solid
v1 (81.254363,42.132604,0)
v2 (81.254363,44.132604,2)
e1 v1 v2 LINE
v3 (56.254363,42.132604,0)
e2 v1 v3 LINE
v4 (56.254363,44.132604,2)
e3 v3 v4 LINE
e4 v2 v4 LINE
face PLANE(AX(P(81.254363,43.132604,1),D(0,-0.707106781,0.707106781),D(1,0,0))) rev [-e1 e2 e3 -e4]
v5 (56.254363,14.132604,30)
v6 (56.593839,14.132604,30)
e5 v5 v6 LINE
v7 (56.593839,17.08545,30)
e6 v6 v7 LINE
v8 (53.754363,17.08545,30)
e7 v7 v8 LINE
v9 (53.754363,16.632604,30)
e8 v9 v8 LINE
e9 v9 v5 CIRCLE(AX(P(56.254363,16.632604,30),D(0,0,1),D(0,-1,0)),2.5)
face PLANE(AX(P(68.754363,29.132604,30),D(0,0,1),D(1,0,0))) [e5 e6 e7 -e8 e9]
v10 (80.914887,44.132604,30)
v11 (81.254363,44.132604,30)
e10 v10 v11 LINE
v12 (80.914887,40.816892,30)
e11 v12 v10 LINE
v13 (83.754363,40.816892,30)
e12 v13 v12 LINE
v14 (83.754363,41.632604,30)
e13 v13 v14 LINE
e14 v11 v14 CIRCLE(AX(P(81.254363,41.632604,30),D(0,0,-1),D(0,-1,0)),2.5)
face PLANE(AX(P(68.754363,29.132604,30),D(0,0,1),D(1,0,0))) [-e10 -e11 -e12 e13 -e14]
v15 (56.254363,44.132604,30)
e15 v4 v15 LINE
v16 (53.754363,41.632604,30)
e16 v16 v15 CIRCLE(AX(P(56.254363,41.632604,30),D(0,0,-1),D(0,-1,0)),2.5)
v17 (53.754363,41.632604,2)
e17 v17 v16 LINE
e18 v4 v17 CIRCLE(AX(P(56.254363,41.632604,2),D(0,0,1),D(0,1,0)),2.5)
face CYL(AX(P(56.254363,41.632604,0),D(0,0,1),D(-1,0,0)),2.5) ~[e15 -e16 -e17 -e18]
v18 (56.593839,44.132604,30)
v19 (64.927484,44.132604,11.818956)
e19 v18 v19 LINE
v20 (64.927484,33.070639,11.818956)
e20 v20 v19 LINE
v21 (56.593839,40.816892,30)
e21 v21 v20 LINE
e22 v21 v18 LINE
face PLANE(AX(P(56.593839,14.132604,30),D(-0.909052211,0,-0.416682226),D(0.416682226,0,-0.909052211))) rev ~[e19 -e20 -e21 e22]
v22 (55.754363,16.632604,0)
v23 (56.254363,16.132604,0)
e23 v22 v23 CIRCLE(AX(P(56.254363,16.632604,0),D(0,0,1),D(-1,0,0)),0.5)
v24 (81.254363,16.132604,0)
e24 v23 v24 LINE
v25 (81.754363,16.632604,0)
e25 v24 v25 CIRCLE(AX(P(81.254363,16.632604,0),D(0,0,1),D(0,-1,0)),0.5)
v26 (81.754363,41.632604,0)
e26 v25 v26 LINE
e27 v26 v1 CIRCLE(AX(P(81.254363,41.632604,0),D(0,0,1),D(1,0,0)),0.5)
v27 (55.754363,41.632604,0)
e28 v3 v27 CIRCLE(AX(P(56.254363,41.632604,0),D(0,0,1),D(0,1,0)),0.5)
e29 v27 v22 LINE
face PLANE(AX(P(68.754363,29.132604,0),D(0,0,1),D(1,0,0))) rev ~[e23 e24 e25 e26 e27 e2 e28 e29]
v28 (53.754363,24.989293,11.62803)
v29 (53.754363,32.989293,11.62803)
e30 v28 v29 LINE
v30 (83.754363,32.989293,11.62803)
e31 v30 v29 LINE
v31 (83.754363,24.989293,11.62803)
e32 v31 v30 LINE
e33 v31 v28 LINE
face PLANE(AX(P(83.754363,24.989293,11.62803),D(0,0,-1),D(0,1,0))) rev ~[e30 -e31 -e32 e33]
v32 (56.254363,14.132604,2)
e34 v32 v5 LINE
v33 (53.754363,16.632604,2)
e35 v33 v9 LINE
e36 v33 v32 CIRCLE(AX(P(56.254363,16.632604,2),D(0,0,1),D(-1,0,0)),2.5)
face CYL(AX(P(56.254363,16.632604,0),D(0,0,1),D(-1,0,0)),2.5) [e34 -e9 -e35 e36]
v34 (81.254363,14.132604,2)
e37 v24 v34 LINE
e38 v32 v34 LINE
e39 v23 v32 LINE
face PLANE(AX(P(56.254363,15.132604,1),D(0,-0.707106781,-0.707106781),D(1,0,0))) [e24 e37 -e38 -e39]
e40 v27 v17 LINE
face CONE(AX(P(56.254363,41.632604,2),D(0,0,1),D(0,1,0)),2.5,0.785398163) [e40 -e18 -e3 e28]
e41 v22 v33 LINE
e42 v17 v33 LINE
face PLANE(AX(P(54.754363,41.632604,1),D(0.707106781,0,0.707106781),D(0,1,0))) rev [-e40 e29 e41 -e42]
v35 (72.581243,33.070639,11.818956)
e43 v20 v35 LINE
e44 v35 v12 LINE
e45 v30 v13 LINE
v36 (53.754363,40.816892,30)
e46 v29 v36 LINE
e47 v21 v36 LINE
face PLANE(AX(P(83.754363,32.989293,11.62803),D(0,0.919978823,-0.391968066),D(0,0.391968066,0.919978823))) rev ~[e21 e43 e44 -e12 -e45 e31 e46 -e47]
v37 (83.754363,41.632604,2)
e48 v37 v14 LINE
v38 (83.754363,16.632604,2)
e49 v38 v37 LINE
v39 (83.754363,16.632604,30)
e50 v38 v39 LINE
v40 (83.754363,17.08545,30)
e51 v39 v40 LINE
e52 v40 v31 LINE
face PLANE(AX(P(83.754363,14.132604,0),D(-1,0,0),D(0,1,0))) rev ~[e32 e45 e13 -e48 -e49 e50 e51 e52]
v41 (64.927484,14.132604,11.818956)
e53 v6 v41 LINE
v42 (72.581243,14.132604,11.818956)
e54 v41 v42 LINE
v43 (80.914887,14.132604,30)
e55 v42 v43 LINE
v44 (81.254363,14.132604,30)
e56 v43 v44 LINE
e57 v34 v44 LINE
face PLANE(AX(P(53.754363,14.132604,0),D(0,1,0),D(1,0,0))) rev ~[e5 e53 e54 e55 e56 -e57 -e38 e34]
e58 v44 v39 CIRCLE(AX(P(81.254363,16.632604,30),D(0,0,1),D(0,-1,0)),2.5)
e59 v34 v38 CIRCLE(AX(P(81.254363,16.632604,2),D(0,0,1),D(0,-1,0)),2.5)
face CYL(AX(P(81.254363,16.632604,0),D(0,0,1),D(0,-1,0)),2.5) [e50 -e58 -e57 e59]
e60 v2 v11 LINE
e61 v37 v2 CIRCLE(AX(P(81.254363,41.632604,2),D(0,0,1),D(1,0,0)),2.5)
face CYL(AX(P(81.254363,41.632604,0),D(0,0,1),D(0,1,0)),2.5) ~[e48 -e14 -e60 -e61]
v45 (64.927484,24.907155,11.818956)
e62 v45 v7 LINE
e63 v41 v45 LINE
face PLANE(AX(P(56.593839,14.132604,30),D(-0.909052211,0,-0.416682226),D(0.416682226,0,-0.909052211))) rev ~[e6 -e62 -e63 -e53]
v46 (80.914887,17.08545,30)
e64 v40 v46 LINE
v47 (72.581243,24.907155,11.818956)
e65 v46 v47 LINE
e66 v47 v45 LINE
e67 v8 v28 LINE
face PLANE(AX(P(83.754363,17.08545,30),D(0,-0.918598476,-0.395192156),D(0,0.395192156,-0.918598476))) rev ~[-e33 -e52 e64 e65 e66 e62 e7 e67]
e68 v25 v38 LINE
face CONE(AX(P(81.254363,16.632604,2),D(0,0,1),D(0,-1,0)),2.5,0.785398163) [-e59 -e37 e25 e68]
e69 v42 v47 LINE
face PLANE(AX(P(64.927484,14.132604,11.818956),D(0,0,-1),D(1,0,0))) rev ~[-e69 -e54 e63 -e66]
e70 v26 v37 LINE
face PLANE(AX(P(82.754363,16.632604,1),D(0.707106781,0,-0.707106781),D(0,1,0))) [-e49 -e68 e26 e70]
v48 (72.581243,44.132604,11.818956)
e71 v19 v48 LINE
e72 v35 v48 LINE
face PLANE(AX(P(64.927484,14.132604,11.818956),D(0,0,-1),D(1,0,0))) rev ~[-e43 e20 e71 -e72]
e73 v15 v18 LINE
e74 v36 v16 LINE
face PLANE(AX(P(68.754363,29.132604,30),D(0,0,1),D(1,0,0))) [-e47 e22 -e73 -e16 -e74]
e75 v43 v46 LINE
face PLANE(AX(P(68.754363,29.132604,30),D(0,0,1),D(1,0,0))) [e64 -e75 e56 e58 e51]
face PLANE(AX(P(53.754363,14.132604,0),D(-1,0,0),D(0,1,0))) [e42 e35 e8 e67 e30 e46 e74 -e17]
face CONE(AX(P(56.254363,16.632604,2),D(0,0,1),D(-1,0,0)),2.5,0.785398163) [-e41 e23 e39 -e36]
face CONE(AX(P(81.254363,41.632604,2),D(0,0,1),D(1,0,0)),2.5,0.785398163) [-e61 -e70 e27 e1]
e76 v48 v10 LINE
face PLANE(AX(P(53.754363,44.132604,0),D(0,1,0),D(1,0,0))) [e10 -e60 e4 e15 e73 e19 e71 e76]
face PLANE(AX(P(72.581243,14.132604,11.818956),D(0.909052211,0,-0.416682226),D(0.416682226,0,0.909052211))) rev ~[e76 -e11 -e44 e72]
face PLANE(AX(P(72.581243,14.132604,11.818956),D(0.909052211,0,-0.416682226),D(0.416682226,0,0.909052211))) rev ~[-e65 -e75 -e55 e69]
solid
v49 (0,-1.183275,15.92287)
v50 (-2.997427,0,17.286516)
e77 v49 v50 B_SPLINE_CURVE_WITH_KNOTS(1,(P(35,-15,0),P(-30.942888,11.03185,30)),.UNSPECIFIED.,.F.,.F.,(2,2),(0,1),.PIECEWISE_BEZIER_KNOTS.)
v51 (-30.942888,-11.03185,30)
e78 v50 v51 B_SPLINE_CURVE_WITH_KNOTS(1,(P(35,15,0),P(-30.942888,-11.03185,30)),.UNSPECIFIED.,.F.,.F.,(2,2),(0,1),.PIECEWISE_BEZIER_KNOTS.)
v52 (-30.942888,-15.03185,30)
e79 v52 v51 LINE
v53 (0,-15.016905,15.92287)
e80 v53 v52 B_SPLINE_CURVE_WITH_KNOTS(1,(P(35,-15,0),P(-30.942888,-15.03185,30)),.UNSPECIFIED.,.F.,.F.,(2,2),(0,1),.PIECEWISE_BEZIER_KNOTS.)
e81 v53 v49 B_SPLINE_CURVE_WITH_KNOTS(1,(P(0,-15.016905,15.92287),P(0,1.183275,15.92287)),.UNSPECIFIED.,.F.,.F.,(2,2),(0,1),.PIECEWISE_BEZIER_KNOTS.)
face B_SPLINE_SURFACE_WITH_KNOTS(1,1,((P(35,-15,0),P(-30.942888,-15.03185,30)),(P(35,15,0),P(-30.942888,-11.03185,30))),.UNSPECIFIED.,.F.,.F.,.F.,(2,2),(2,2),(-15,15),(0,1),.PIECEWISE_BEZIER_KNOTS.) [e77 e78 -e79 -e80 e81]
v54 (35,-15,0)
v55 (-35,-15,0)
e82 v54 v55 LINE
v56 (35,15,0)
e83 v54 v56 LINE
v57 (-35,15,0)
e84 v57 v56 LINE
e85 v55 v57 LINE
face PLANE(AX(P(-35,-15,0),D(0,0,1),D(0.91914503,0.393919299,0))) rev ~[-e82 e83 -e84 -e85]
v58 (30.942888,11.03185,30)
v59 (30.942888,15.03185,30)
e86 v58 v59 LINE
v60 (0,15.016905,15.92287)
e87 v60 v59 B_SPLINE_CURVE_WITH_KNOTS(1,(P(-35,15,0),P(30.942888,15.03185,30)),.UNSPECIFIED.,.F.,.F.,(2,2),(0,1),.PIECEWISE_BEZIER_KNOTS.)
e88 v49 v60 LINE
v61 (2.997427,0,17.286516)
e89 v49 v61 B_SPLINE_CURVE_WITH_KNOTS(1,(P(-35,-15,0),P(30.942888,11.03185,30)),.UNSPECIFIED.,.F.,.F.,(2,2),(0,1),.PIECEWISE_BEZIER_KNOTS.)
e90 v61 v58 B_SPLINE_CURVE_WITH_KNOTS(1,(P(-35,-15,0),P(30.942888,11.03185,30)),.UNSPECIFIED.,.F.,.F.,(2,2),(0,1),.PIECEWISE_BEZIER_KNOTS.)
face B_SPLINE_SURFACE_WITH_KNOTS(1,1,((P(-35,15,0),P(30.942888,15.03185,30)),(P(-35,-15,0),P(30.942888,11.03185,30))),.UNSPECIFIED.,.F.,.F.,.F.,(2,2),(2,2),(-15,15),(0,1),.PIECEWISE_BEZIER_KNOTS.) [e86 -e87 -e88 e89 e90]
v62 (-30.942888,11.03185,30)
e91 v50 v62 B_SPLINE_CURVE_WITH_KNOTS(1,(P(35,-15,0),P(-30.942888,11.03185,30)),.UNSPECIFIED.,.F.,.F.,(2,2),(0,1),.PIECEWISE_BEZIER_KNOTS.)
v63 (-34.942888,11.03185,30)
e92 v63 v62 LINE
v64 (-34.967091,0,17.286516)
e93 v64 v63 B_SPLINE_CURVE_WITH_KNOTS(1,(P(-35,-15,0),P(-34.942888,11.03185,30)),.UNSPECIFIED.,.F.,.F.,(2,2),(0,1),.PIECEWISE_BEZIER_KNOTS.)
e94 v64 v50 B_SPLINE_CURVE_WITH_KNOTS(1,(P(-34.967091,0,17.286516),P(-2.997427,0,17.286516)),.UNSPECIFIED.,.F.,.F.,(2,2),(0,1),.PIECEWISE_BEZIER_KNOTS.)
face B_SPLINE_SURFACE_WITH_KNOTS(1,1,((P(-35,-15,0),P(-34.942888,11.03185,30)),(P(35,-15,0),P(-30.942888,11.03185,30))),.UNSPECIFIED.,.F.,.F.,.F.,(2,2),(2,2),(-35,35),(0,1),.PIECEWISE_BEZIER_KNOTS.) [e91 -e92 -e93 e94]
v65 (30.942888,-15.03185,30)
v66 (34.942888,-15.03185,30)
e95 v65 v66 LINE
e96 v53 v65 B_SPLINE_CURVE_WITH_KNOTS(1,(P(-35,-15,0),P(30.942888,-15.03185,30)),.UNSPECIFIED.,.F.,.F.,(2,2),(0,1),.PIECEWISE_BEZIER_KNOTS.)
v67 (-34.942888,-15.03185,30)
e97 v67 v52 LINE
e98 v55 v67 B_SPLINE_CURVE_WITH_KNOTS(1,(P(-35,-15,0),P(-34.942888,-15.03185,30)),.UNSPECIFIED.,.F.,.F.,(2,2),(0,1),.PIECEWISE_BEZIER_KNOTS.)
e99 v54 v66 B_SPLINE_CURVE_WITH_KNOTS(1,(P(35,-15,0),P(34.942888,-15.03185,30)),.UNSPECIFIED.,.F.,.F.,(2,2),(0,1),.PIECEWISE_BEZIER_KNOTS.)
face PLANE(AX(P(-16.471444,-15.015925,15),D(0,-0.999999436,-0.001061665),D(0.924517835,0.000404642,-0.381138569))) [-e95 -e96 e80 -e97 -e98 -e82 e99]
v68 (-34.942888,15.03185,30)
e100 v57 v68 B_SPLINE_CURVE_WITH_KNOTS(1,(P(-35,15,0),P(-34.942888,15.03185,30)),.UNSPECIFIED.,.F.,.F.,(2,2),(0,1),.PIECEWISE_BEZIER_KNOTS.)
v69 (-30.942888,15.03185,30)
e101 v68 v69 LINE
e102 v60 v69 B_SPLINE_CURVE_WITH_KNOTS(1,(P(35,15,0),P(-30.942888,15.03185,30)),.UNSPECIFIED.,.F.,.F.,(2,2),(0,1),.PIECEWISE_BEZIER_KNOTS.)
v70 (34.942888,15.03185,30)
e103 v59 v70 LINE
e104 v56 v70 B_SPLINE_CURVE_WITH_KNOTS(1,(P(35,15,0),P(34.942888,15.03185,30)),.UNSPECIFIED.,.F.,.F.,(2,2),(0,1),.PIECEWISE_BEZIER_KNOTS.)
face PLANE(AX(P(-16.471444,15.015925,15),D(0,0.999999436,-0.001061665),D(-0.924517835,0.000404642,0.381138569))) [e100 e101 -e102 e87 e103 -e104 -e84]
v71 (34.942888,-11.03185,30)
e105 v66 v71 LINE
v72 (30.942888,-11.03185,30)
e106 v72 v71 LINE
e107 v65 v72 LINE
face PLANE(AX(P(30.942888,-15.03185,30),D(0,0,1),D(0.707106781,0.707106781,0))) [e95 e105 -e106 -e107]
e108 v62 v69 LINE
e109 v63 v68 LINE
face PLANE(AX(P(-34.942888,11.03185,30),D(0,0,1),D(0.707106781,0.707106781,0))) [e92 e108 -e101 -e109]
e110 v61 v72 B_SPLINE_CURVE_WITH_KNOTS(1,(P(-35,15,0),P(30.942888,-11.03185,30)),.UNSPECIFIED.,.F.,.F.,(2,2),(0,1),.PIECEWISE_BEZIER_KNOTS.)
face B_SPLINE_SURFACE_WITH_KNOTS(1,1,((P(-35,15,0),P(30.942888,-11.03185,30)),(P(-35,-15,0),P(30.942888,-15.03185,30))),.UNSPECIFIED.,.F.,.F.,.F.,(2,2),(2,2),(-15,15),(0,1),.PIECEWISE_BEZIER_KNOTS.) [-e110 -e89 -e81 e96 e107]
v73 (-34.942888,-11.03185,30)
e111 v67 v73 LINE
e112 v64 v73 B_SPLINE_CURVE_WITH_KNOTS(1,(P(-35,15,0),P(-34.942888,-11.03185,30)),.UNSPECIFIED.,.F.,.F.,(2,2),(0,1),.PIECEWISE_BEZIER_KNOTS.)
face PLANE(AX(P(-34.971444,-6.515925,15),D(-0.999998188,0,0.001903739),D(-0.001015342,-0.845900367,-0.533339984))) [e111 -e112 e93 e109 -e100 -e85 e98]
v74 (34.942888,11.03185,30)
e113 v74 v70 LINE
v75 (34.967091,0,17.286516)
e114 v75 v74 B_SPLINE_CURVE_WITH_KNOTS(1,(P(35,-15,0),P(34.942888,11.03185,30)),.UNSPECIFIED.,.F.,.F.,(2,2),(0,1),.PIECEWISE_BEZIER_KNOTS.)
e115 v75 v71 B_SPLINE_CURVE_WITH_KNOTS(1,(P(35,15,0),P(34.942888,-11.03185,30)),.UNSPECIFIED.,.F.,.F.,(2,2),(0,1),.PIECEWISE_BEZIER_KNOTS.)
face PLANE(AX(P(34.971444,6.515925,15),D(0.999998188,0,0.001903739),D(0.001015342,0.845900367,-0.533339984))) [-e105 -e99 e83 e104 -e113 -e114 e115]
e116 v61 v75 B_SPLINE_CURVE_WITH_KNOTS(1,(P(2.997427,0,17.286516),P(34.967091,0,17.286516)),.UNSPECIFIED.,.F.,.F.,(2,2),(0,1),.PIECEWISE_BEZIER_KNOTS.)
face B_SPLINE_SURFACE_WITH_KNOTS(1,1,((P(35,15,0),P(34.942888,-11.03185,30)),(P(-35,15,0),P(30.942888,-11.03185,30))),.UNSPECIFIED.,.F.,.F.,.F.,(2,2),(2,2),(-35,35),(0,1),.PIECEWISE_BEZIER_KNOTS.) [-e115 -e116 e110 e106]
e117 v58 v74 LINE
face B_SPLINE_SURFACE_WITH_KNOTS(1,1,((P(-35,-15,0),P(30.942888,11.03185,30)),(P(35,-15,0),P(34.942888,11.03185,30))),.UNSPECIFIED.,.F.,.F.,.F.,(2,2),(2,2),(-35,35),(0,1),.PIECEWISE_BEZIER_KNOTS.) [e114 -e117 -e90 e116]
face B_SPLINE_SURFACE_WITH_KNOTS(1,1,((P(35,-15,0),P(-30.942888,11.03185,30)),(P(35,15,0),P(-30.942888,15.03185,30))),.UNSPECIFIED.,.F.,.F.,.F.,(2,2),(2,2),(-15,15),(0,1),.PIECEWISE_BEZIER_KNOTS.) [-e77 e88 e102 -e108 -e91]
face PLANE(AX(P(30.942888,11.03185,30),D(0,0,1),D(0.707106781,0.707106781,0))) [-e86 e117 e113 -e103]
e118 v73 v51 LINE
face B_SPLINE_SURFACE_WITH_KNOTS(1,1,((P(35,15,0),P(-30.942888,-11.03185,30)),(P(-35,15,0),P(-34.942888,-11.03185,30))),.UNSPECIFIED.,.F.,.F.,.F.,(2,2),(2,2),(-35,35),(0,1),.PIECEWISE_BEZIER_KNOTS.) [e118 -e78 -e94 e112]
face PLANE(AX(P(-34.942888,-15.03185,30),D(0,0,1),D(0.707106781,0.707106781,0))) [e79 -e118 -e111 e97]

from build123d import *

# Parameters (mm, degrees)
F0_W      = 70
F0_H      = 30
F2_W      = 4
F2_H      = 4
F7_W      = 30
F7_H      = 30
F8_DEPTH  = 30
F10_DEPTH = 30
F12_DEPTH = 30
F13_R     = 2.5
F14_SIZE  = 2
F16_DEPTH = 1


# Not quite as in the source:
# - the program builds the solid bodies; features that only make, move or delete a surface that nothing else refers to are left out


with BuildPart() as f3:
    # F0 (on Top) → F3 section 0
    with BuildSketch(Plane.XY):
        Rectangle(F0_W, F0_H)
    # F2 (on offset) → F3 section 1
    with BuildSketch(Plane.XY.offset(30)):
        with Locations((-32.9428877234, 13.0318499655)):
            Rectangle(F2_W, F2_H)
    loft()

    # F0 (on Top) → F4 section 0
    with BuildSketch(Plane.XY):
        Rectangle(F0_W, F0_H)
    # F2 (on offset) → F4 section 1
    with BuildSketch(Plane.XY.offset(30)):
        with Locations((-32.9428877234, -13.0318499655)):
            Rectangle(F2_W, F2_H)
    loft()

    # F0 (on Top) → F5 section 0
    with BuildSketch(Plane.XY):
        Rectangle(F0_W, F0_H)
    # F2 (on offset) → F5 section 1
    with BuildSketch(Plane.XY.offset(30)):
        with Locations((32.9428877234, 13.0318499655)):
            Rectangle(F2_W, F2_H)
    loft()

    # F0 (on Top) → F6 section 0
    with BuildSketch(Plane.XY):
        Rectangle(F0_W, F0_H)
    # F2 (on offset) → F6 section 1
    with BuildSketch(Plane.XY.offset(30)):
        with Locations((32.9428877234, -13.0318499655)):
            Rectangle(F2_W, F2_H)
    loft()

    # F15 (on face) → F16 (cut)
    with BuildSketch(Plane.XY):
        with BuildLine():
            Line((35.1080348898, -15.1526350975), (34.9516024797, -15.1445783328))
            add(Edge.make_bspline(
                [(34.9516024797, -15.1445783328), (35.015165041, -15.1823826041), (35.0943421483, -15.2143125307), (35.1068899686, -15.1744342874), (35.1080348898, -15.1526350975)],
                knots=[0.9766966093, 0.9766966093, 0.9766966093, 0.9766966093, 0.9875020446, 0.9956975312, 0.9956975312, 0.9956975312, 0.9956975312], degree=3))
        make_face()
        with BuildLine():
            add(Edge.make_bspline(
                [(34.9719375372, 15.0837432593), (34.3538024078, 14.0181605259), (33.061090265, 11.7896967595), (28.21171153, 13.2006080373), (27.1952390941, 9.3934277248), (29.922433417, 8.7236693731), (30.66603681, 5.9963298393), (28.2491739951, 4.334922985), (27.3280801702, 1.5528957375), (30.0258958231, -0.6289713137), (28.5607968581, -2.7152455487), (26.9189490059, -6.683113184), (28.0022887063, -10.124238159), (31.4043979295, -12.0624753884), (34.4968064554, -14.8740852642), (34.9516024797, -15.1445783328)],
                knots=[0, 0, 0, 0, 0.0798778427, 0.1670493267, 0.2351952706, 0.3009592707, 0.365159693, 0.4364229102, 0.5052200474, 0.5772019582, 0.6402928372, 0.7295168151, 0.8063783849, 0.8993827171, 0.9766966093, 0.9766966093, 0.9766966093, 0.9766966093], degree=3))
            Line((34.9719375372, 15.0837432593), (30.7977404445, 15.1190953329))
            add(Edge.make_bspline(
                [(30.7977404445, 15.1190953329), (27.9337164263, 14.9101728987), (23.2612948103, 14.5693329856), (21.9160397808, 10.5126541312), (24.7378669193, 8.603835829), (26.4017007473, 6.8089006332), (24.7706534907, 4.1161935184), (23.430847623, 2.0997794876), (24.2510655844, -0.0048017343), (23.8127653987, -3.4550826329), (22.7751457805, -5.8090586344), (23.1402314335, -9.1926239549), (26.1749460731, -14.6137627403), (29.3308994565, -14.8300937762), (30.7977404445, -14.9306412786)],
                knots=[0, 0, 0, 0, 0.1234279581, 0.2013626477, 0.2811427777, 0.3472159084, 0.4234693912, 0.4927276654, 0.5582341134, 0.6420069112, 0.7141429329, 0.7966122672, 0.9054683556, 1, 1, 1, 1], degree=3))
            Line((30.7977404445, -14.9306412786), (34.9516024797, -15.1445783328))
        make_face()
        with BuildLine():
            Line((-30.7977404445, 15.1190953329), (-34.9719375372, 15.0837432593))
            add(Edge.make_bspline(
                [(-34.9719375372, 15.0837432593), (-34.3538024078, 14.0181605259), (-33.061090265, 11.7896967595), (-28.21171153, 13.2006080373), (-27.1952390941, 9.3934277248), (-29.922433417, 8.7236693731), (-30.66603681, 5.9963298393), (-28.2491739951, 4.334922985), (-27.3280801702, 1.5528957375), (-30.0258958231, -0.6289713137), (-28.5607968581, -2.7152455487), (-26.9189490059, -6.683113184), (-28.0022887063, -10.124238159), (-31.5081547913, -12.1215873684), (-34.7720178817, -15.125865809), (-35.0565479429, -15.1937999645)],
                knots=[0, 0, 0, 0, 0.0798778427, 0.1670493267, 0.2351952706, 0.3009592707, 0.365159693, 0.4364229102, 0.5052200474, 0.5772019582, 0.6402928372, 0.7295168151, 0.8063783849, 0.8993827171, 0.9842350503, 0.9842350503, 0.9842350503, 0.9842350503], degree=3))
            Line((-35.0565479429, -15.1937999645), (-30.7977404445, -14.9306412786))
            add(Edge.make_bspline(
                [(-30.7977404445, 15.1190953329), (-27.9337164263, 14.9101728987), (-23.2612948103, 14.5693329856), (-21.9160397808, 10.5126541312), (-24.7378669193, 8.603835829), (-26.4017007473, 6.8089006332), (-24.7706534907, 4.1161935184), (-23.430847623, 2.0997794876), (-24.2510655844, -0.0048017343), (-23.8127653987, -3.4550826329), (-22.7751457805, -5.8090586344), (-23.1402314335, -9.1926239549), (-26.1749460731, -14.6137627403), (-29.3308994565, -14.8300937762), (-30.7977404445, -14.9306412786)],
                knots=[0, 0, 0, 0, 0.1234279581, 0.2013626477, 0.2811427777, 0.3472159084, 0.4234693912, 0.4927276654, 0.5582341134, 0.6420069112, 0.7141429329, 0.7966122672, 0.9054683556, 1, 1, 1, 1], degree=3))
        make_face()
        with BuildLine():
            add(Edge.make_bspline(
                [(-35.0565479429, -15.1937999645), (-35.067502952, -15.1964155731), (-35.0765714389, -15.197007162), (-35.0836701691, -15.1954758912)],
                knots=[0.9842350503, 0.9842350503, 0.9842350503, 0.9842350503, 0.9875020446, 0.9875020446, 0.9875020446, 0.9875020446], degree=3))
            Line((-35.0565479429, -15.1937999645), (-35.0836701691, -15.1954758912))
        make_face()
    extrude(amount=-F16_DEPTH, mode=Mode.SUBTRACT)


with BuildPart() as f8:
    # F7 (on Top) → F8 (new body)
    with BuildSketch(Plane.XY):
        with Locations((68.754363209, 29.132604003)):
            Rectangle(F7_W, F7_H)
    extrude(amount=F8_DEPTH)

    # F9 (on face) → F10 (cut)
    with BuildSketch(Plane.XZ.offset(-14.132604003)):
        Polygon((80.9148873389, 30), (56.5938390791, 30), (64.9274835954, 11.818955776), (68.754363209, 11.818955776), (72.5812428226, 11.818955776), align=None)
    extrude(amount=-F10_DEPTH, mode=Mode.SUBTRACT)

    # F11 (on face) → F12 (cut)
    with BuildSketch(Plane.YZ.offset(83.754363209)):
        Polygon((40.8168919384, 30), (17.0854497701, 30), (24.9892928991, 11.6280304868), (32.9892928991, 11.6280304868), align=None)
    extrude(amount=-F12_DEPTH, mode=Mode.SUBTRACT)

    # F13
    f13_edges = [f8.edges().sort_by_distance(p)[0] for p in [
        (83.754363, 14.132604, 15),
        (53.754363, 14.132604, 15),
        (83.754363, 44.132604, 15),
        (53.754363, 44.132604, 15),
    ]]
    fillet(f13_edges, radius=F13_R)

    # F14
    f14_edges = [f8.edges().sort_by_distance(p)[0] for p in [
        (83.754363, 29.132604, 0),
    ]]
    chamfer(f14_edges, length=F14_SIZE)


solid = Compound([f3.part, f8.part])
